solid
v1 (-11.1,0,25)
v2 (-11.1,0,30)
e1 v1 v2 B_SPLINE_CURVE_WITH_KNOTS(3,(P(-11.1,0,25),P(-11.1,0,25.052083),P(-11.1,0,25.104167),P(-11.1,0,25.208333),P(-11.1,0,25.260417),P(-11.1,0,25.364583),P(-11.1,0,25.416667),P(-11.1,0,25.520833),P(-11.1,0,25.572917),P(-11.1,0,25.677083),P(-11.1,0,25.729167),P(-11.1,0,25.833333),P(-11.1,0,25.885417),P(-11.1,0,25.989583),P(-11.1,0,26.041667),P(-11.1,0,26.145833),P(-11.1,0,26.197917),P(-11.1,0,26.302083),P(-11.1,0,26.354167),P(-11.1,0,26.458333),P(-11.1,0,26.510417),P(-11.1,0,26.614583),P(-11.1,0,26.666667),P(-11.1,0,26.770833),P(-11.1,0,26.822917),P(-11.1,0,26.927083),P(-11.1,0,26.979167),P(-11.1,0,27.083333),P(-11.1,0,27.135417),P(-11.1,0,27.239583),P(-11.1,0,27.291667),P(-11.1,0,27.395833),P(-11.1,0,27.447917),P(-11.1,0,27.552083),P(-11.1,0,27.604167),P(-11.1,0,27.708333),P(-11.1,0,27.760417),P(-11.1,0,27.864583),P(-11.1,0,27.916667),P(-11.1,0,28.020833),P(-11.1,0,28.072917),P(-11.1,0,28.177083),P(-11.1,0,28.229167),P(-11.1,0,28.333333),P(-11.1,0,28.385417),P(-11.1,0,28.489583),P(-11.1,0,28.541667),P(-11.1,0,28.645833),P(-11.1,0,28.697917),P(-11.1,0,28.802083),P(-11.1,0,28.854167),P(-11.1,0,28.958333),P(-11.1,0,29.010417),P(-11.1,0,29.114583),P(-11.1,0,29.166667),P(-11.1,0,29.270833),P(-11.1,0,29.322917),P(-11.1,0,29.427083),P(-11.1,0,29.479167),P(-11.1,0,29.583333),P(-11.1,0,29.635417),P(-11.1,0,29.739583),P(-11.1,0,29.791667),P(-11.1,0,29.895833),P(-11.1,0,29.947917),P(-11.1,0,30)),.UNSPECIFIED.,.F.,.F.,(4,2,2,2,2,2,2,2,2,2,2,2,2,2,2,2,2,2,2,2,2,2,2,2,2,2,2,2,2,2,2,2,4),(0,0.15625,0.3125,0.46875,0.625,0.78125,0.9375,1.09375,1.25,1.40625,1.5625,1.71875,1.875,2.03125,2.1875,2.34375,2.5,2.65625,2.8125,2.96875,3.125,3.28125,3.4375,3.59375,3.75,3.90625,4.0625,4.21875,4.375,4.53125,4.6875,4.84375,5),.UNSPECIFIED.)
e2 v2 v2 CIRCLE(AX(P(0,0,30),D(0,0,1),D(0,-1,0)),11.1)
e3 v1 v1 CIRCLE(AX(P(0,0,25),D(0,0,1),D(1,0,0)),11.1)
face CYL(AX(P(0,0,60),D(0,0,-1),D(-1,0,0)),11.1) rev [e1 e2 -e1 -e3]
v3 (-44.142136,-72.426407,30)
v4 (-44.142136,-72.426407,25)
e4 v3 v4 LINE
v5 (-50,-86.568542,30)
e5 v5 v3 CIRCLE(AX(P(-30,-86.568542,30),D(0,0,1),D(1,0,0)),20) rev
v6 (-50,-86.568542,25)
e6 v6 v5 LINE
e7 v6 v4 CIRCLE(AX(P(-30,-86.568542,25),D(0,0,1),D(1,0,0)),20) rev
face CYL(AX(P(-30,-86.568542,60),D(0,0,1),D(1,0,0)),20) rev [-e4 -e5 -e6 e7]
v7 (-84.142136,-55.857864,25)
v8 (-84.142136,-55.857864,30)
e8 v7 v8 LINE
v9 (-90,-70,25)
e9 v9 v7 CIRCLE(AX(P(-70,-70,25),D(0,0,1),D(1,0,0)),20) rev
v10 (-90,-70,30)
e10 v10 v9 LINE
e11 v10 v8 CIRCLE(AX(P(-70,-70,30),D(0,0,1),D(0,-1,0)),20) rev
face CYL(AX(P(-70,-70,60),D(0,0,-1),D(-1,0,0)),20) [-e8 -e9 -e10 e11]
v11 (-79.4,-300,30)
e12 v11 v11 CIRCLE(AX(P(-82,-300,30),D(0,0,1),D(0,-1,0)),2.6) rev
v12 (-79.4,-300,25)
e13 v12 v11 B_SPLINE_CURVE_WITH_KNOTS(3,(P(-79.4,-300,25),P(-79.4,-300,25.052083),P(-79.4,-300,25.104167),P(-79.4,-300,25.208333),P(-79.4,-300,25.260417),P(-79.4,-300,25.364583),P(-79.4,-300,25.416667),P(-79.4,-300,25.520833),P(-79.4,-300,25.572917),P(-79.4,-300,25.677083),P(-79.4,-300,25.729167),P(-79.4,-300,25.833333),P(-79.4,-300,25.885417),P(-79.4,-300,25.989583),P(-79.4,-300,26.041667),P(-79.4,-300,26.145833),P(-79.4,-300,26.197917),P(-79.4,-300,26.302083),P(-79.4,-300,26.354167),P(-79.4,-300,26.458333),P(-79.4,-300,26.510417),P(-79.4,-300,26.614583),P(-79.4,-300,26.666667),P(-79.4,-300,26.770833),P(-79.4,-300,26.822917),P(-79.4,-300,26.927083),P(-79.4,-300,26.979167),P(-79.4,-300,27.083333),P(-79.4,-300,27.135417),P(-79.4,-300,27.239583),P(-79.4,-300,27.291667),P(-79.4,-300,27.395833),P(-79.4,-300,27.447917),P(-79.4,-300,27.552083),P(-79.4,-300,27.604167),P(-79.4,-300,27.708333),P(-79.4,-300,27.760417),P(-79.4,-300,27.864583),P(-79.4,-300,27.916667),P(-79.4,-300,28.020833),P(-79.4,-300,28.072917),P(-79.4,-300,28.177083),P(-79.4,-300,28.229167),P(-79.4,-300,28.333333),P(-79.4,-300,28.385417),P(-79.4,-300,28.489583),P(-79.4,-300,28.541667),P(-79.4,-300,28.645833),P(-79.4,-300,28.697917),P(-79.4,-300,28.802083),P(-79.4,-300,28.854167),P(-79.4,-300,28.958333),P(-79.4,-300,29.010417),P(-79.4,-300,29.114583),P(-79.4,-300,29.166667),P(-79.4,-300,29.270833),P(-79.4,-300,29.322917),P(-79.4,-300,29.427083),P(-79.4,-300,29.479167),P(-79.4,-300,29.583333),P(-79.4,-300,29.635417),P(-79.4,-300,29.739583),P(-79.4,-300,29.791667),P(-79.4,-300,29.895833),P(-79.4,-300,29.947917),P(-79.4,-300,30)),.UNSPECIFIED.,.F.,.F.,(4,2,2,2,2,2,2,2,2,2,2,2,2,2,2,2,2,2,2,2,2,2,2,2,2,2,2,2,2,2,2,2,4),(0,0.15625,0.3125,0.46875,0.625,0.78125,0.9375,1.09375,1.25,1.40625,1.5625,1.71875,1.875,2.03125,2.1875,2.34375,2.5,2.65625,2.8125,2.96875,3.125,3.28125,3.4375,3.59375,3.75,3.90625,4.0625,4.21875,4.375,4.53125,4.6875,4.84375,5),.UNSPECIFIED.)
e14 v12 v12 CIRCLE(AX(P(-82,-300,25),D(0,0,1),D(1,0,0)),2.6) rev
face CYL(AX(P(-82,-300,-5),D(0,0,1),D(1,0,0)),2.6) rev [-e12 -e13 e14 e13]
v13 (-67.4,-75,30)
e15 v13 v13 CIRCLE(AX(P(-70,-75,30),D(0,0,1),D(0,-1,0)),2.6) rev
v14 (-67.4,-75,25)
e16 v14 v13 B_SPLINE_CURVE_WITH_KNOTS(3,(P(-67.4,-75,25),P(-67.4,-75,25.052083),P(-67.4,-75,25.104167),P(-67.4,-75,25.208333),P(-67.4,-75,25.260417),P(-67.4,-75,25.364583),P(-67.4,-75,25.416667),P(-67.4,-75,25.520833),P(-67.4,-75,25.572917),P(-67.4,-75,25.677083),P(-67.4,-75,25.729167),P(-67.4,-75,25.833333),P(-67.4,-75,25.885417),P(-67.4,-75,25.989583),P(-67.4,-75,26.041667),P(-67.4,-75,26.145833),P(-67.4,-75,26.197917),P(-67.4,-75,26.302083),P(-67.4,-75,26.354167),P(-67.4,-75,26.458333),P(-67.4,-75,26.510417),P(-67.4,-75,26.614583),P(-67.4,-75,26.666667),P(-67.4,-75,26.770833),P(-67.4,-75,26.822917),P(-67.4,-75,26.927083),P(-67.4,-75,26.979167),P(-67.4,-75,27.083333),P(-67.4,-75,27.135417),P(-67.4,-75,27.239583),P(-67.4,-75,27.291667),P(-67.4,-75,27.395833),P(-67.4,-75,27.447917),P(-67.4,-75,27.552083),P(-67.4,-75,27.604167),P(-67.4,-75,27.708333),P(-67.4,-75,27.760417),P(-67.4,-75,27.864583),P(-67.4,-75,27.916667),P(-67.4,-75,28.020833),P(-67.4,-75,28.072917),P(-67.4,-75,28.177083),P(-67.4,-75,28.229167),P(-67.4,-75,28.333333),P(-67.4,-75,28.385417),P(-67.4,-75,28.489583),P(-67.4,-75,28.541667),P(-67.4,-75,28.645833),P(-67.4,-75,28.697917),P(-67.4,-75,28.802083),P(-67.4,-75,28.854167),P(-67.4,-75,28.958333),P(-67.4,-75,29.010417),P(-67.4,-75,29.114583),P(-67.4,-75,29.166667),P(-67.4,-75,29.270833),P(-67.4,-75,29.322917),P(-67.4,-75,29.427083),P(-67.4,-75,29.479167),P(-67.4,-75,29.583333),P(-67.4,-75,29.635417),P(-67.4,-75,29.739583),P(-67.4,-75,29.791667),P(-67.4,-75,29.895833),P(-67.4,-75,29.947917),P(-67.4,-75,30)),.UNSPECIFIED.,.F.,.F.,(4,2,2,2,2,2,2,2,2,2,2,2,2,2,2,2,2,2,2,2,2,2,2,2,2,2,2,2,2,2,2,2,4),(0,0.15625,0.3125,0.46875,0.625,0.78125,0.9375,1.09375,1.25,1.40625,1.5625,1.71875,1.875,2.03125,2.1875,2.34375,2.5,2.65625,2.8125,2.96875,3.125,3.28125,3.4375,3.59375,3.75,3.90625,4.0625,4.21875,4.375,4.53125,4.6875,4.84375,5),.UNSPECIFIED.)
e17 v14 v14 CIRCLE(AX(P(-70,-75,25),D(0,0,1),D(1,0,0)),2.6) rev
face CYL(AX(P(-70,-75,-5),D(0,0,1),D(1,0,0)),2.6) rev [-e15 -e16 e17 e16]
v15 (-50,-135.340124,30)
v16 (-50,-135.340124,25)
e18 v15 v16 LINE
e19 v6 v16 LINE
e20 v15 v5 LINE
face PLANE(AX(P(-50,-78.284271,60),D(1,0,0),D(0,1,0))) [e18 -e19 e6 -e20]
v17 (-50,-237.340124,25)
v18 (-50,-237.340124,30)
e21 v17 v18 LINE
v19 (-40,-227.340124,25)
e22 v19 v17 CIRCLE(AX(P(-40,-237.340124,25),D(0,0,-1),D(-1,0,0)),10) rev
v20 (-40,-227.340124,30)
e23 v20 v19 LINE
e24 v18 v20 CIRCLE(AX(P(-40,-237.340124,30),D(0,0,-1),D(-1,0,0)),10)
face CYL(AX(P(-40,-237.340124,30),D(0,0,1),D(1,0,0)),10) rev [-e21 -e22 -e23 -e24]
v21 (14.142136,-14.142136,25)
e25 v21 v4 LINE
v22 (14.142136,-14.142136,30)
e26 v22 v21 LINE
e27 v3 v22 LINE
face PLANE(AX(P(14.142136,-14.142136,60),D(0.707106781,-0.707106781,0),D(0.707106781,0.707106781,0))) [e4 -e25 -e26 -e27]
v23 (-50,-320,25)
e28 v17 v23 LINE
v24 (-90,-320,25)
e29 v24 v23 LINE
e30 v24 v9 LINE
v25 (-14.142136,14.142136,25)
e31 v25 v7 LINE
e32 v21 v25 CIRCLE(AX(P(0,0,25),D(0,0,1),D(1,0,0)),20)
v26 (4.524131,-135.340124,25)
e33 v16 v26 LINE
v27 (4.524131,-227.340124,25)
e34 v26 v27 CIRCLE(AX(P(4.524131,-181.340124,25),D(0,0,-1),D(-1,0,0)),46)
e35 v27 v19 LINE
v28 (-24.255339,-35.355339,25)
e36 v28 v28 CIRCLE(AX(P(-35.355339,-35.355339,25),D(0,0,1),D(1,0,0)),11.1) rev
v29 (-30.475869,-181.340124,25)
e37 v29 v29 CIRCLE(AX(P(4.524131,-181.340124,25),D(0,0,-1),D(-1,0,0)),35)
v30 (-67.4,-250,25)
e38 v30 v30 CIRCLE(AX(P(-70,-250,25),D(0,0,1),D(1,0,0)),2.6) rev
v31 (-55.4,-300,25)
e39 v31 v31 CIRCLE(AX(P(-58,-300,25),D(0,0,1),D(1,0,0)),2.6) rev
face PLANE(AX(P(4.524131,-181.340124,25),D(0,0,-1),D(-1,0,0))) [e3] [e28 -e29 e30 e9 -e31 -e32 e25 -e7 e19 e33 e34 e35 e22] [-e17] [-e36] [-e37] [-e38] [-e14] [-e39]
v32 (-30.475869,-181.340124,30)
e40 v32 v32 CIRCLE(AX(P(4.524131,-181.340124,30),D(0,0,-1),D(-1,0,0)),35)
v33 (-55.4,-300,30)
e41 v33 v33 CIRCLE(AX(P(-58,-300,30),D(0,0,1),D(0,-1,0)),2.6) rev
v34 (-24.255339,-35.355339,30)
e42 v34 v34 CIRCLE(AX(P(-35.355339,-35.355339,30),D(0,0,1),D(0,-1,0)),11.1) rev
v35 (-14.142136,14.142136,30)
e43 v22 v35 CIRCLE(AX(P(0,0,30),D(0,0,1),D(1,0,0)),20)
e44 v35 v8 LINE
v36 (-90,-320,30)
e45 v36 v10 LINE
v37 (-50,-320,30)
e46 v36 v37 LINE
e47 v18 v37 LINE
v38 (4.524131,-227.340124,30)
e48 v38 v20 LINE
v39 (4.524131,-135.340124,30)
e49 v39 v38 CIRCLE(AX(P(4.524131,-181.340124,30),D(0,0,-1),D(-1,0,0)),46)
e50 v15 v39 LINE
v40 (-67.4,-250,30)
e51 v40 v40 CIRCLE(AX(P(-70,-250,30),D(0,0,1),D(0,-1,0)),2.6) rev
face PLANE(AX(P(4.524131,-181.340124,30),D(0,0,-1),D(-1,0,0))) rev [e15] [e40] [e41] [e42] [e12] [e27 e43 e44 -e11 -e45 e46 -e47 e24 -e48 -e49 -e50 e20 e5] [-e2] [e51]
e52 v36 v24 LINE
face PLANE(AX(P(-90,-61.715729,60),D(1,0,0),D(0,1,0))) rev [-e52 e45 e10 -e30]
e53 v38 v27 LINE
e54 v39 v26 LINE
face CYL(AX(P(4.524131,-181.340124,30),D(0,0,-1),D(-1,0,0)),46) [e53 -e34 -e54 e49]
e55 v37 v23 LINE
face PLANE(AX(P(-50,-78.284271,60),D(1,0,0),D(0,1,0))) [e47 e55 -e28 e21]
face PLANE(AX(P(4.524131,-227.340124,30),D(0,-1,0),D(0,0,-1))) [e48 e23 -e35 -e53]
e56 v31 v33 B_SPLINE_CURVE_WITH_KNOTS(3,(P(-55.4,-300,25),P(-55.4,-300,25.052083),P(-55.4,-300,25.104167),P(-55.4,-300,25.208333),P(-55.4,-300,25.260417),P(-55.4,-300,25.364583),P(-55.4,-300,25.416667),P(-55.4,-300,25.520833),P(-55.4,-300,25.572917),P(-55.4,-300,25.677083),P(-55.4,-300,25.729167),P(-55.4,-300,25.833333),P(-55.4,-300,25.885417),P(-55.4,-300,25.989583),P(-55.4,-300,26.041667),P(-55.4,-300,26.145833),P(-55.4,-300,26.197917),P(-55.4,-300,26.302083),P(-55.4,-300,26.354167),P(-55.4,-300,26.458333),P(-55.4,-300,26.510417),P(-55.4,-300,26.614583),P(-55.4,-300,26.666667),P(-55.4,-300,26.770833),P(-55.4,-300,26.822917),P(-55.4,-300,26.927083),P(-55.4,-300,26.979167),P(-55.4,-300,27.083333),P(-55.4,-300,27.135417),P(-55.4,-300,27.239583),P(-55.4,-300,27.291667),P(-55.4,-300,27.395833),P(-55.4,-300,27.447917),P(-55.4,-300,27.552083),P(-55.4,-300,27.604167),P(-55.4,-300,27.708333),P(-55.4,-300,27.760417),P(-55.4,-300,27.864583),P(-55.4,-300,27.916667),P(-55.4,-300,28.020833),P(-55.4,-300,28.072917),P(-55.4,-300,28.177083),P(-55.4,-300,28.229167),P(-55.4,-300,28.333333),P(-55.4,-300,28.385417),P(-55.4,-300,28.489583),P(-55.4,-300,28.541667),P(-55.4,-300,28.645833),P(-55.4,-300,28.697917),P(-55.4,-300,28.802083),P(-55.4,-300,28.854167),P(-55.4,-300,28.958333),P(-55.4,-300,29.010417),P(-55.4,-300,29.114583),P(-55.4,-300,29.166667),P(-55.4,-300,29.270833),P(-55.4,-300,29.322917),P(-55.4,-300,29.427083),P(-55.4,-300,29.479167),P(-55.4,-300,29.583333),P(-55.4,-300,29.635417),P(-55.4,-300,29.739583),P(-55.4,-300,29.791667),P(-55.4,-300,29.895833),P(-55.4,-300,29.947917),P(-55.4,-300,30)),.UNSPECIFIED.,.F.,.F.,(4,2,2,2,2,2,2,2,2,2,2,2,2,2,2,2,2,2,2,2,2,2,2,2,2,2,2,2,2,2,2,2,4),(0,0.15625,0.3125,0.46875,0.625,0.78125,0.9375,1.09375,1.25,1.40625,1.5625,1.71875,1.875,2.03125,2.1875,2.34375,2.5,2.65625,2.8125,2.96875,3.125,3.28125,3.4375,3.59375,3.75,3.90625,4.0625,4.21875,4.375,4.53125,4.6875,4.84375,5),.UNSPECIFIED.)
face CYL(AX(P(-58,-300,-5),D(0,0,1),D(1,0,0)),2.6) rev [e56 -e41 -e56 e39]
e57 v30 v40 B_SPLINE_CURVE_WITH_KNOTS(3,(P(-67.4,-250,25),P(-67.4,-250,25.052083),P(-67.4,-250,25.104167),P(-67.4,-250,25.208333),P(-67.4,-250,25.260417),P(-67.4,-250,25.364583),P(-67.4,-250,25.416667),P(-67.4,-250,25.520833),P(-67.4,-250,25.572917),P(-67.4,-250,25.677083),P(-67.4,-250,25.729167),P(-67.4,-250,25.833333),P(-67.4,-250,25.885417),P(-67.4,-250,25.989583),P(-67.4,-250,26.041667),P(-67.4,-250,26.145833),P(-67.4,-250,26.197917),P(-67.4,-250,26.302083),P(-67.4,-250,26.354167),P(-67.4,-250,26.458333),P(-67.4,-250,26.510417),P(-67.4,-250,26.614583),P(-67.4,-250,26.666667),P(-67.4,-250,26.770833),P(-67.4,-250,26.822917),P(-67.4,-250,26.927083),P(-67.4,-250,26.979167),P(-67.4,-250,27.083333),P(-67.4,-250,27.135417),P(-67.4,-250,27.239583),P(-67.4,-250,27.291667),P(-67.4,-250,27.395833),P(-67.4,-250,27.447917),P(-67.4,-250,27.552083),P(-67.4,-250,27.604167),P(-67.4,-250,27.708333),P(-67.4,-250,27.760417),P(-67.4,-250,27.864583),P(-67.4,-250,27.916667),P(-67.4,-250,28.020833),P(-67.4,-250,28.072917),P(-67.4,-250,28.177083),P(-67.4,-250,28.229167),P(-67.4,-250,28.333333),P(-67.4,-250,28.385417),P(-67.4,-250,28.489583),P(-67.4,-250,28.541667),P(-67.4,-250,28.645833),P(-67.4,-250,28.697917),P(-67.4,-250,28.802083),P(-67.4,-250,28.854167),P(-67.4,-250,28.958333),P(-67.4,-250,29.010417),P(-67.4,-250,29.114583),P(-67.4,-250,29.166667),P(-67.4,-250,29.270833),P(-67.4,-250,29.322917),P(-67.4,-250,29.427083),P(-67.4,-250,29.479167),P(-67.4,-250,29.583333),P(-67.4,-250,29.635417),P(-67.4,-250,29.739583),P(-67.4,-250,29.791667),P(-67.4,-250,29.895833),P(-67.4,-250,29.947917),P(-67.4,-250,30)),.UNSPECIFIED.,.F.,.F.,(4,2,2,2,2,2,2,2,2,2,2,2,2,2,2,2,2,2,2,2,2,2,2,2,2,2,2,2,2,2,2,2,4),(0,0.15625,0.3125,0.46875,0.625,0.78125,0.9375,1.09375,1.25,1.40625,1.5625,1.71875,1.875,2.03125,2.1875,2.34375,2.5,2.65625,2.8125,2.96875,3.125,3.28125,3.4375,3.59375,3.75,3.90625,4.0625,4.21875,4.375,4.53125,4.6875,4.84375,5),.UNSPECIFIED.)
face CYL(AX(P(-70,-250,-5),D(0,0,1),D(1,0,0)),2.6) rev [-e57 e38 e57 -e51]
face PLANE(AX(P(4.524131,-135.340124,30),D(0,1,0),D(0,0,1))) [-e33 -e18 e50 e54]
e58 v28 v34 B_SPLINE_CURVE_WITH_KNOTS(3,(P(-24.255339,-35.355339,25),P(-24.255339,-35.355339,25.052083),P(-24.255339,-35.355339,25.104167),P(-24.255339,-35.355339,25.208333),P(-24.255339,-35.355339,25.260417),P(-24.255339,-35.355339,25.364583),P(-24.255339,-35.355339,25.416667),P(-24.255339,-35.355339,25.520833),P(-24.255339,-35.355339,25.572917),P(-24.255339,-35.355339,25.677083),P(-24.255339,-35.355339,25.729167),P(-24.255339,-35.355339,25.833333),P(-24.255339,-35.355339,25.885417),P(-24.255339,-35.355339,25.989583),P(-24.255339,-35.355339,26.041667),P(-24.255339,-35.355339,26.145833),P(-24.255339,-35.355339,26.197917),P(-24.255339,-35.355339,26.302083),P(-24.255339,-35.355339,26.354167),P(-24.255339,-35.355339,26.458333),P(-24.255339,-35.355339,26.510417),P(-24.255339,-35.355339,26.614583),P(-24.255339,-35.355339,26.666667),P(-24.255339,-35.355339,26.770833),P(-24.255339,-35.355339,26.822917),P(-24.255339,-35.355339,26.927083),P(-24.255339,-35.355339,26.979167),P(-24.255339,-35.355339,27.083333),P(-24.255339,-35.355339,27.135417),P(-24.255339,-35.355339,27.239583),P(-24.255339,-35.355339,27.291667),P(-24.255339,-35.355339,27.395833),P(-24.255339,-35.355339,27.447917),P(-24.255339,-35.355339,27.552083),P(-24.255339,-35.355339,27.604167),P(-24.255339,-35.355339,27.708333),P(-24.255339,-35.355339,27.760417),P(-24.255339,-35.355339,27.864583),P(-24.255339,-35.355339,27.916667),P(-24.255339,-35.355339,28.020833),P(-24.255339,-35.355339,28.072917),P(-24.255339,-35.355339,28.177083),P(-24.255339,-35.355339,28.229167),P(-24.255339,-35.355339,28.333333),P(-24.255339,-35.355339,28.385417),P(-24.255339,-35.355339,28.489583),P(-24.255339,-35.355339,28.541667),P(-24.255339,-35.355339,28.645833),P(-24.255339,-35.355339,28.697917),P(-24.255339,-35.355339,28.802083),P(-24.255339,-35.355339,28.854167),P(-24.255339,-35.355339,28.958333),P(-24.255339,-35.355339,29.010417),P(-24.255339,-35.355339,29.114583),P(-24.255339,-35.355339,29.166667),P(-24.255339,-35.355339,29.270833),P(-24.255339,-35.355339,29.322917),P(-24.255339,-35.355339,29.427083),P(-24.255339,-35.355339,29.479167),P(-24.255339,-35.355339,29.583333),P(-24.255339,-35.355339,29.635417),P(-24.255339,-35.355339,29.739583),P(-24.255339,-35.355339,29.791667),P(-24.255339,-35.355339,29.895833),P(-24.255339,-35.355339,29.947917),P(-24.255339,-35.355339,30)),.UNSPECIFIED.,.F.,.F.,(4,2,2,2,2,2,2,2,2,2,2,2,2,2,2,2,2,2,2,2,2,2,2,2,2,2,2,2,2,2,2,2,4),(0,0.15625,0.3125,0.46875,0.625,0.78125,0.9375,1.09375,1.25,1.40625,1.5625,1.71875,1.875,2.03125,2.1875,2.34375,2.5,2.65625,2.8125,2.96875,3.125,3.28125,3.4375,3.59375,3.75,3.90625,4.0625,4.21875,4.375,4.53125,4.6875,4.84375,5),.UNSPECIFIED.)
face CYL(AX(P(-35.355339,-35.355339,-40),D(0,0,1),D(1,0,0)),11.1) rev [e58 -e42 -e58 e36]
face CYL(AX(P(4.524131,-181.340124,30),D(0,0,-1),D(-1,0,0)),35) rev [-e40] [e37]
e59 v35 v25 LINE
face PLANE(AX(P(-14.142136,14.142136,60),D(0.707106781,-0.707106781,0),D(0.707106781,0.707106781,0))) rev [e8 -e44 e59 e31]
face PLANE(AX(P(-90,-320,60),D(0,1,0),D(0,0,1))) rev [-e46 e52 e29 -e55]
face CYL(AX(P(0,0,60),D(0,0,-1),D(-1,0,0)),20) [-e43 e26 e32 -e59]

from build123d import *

# Parameters (mm, degrees)
SKETCH_1_R                = 20
SKETCH_1_R_2              = 11.1
EXTRUDE_1_DEPTH           = 60
EXTRUDE_2_DEPTH           = 30
SKETCH_4_R                = 11
EXTRUDE_3_DEPTH           = 5
SKETCH_8_R                = 11.1
CUT_EXTRUDE_1_DEPTH       = 100
FILLET_4_R                = 20
EXTRUDE_START             = -30
SKETCH_18_R               = 35
EXTRUDE_4_DEPTH           = 5
EXTRUDE_START_2           = -25
SKETCH_19_R               = 35
EXTRUDE_5_DEPTH           = 5
FILLET_5_R                = 10
CUT_EXTRUDE_9_DEPTH       = 388.169213652
CUT_EXTRUDE_9_DEPTH_BACK  = 388.169213652
SKETCH_21_R               = 2.6
CUT_EXTRUDE_10_DEPTH      = 409.372938359
CUT_EXTRUDE_10_DEPTH_BACK = 409.372938359
SKETCH_22_W               = 30
SKETCH_22_H               = 469.737304999
SKETCH_22_W_2             = 35
SKETCH_22_H_2             = 431.087956996


with BuildPart() as part:
    # 草图1 → 凸台-拉伸1 (new body)
    with BuildSketch(Plane.XY):
        Circle(SKETCH_1_R)
        Circle(SKETCH_1_R_2, mode=Mode.SUBTRACT)
    extrude(amount=EXTRUDE_1_DEPTH)

    # 草图2 → 凸台-拉伸2 (add, symmetric)
    with BuildSketch(Plane.XY.offset(30)):
        with BuildLine():
            Line((-14.142135624, 14.142135624), (-90, -61.715728753))
            Line((-90, -61.715728753), (-90, -320))
            Line((-90, -320), (-50, -320))
            Line((-50, -320), (-50, -78.284271247))
            Line((-50, -78.284271247), (14.142135624, -14.142135624))
            ThreePointArc((14.142135624, -14.142135624), (-14.142135624, -14.142135624), (-14.142135624, 14.142135624))
        make_face()
    extrude(amount=EXTRUDE_2_DEPTH, both=True)

    # 草图4 → 凸台-拉伸3 (add)
    with BuildSketch(Plane.XY.offset(60)):
        with BuildLine():
            Line((-90, -290), (-50, -290))
            Line((-50, -290), (-50, -350))
            ThreePointArc((-50, -350), (-70, -370), (-90, -350))
            Line((-90, -350), (-90, -290))
        make_face()
        with Locations((-70, -350)):
            Circle(SKETCH_4_R, mode=Mode.SUBTRACT)
    extrude_3 = extrude(amount=EXTRUDE_3_DEPTH)

    # 镜向1: 凸台-拉伸3 across plane
    add(extrude_3.mirror(Plane.XY.offset(30)))

    # 草图8 → 切除-拉伸1 (cut)
    with BuildSketch(Plane.XY.offset(60)):
        with Locations((-35.355339059, -35.355339059)):
            Circle(SKETCH_8_R)
    extrude(amount=-CUT_EXTRUDE_1_DEPTH, mode=Mode.SUBTRACT)

    # 圆角4
    fillet_4_edges = [part.edges().sort_by_distance(p)[0] for p in [
        (-50, -78.284271247, 30),
        (-90, -61.715728753, 30),
    ]]
    fillet(fillet_4_edges, radius=FILLET_4_R)

    # 草图18 → 凸台-拉伸4 (add)
    with BuildSketch(Plane.XY.offset(60).offset(EXTRUDE_START)):
        with BuildLine():
            ThreePointArc((16.783988507, -10.876475983), (15.54903282, -12.578854413), (14.142135624, -14.142135624))
            Line((14.142135624, -14.142135624), (-44.142135624, -72.426406871))
            ThreePointArc((-44.142135624, -72.426406871), (-48.47759065, -78.914873848), (-50, -86.568542495))
            Line((-50, -86.568542495), (-50, -129.282056212))
            Line((-50, -129.282056212), (24.135744866, -129.282056212))
            ThreePointArc((24.135744866, -129.282056212), (66.634203362, -100.885494101), (56.662656801, -50.755144277))
            Line((56.662656801, -50.755144277), (16.783988507, -10.876475983))
        make_face()
        with Locations((24.135744866, -83.282056212)):
            Circle(SKETCH_18_R, mode=Mode.SUBTRACT)
    extrude(amount=EXTRUDE_4_DEPTH)

    # 草图19 → 凸台-拉伸5 (add)
    with BuildSketch(Plane(origin=(0, 0, 0), x_dir=(-1, 0, 0), z_dir=(0, 0, -1)).offset(EXTRUDE_START_2)):
        with BuildLine():
            Line((50, -135.340123781), (50, -227.340123781))
            Line((50, -227.340123781), (-4.524131353, -227.340123781))
            ThreePointArc((-4.524131353, -227.340123781), (-50.524131353, -181.340123781), (-4.524131353, -135.340123781))
            Line((-4.524131353, -135.340123781), (50, -135.340123781))
        make_face()
        with Locations((-4.524131353, -181.340123781)):
            Circle(SKETCH_19_R, mode=Mode.SUBTRACT)
    extrude(amount=-EXTRUDE_5_DEPTH)

    # 圆角5
    # the kernel refuses this fillet: 10 mm, written as the material it adds along each edge
    with BuildSketch(Plane(origin=(-50, -227.340123781, 25), x_dir=(0, -1, 0), z_dir=(0, 0, 1)), Plane(origin=(-50, -129.282056212, 30), x_dir=(0, -1, 0), z_dir=(0, 0, 1))) as fillet_5_piece_1:
        with BuildLine():
            CenterArc((FILLET_5_R, FILLET_5_R), FILLET_5_R, 180, 90)
            Line((0, FILLET_5_R), (0, 0))
            Line((0, 0), (FILLET_5_R, 0))
        make_face()
    extrude(amount=5)

    # 草图21 → 切除-拉伸9 (cut, two sides: drawn at the far end of the back side and taken through both)
    with BuildSketch(Plane.XY.offset(65).offset(-CUT_EXTRUDE_9_DEPTH_BACK)):
        with Locations((-70, -75)):
            Circle(SKETCH_21_R)
        with Locations((-70, -250)):
            Circle(SKETCH_21_R)
        with Locations((-58, -300)):
            Circle(SKETCH_21_R)
        with Locations((-82, -300)):
            Circle(SKETCH_21_R)
    extrude(amount=CUT_EXTRUDE_9_DEPTH + CUT_EXTRUDE_9_DEPTH_BACK, mode=Mode.SUBTRACT)

    # 草图22 → 切除-拉伸10 (cut, two sides: drawn at the far end of the back side and taken through both)
    with BuildSketch(Plane.ZY.offset(90).offset(-CUT_EXTRUDE_10_DEPTH_BACK)):
        with Locations((10, -169.950732915)):
            Rectangle(SKETCH_22_W, SKETCH_22_H)
        with Locations((47.5, -154.456021502)):
            Rectangle(SKETCH_22_W_2, SKETCH_22_H_2)
    extrude(amount=CUT_EXTRUDE_10_DEPTH + CUT_EXTRUDE_10_DEPTH_BACK, mode=Mode.SUBTRACT)


solid = part.part
